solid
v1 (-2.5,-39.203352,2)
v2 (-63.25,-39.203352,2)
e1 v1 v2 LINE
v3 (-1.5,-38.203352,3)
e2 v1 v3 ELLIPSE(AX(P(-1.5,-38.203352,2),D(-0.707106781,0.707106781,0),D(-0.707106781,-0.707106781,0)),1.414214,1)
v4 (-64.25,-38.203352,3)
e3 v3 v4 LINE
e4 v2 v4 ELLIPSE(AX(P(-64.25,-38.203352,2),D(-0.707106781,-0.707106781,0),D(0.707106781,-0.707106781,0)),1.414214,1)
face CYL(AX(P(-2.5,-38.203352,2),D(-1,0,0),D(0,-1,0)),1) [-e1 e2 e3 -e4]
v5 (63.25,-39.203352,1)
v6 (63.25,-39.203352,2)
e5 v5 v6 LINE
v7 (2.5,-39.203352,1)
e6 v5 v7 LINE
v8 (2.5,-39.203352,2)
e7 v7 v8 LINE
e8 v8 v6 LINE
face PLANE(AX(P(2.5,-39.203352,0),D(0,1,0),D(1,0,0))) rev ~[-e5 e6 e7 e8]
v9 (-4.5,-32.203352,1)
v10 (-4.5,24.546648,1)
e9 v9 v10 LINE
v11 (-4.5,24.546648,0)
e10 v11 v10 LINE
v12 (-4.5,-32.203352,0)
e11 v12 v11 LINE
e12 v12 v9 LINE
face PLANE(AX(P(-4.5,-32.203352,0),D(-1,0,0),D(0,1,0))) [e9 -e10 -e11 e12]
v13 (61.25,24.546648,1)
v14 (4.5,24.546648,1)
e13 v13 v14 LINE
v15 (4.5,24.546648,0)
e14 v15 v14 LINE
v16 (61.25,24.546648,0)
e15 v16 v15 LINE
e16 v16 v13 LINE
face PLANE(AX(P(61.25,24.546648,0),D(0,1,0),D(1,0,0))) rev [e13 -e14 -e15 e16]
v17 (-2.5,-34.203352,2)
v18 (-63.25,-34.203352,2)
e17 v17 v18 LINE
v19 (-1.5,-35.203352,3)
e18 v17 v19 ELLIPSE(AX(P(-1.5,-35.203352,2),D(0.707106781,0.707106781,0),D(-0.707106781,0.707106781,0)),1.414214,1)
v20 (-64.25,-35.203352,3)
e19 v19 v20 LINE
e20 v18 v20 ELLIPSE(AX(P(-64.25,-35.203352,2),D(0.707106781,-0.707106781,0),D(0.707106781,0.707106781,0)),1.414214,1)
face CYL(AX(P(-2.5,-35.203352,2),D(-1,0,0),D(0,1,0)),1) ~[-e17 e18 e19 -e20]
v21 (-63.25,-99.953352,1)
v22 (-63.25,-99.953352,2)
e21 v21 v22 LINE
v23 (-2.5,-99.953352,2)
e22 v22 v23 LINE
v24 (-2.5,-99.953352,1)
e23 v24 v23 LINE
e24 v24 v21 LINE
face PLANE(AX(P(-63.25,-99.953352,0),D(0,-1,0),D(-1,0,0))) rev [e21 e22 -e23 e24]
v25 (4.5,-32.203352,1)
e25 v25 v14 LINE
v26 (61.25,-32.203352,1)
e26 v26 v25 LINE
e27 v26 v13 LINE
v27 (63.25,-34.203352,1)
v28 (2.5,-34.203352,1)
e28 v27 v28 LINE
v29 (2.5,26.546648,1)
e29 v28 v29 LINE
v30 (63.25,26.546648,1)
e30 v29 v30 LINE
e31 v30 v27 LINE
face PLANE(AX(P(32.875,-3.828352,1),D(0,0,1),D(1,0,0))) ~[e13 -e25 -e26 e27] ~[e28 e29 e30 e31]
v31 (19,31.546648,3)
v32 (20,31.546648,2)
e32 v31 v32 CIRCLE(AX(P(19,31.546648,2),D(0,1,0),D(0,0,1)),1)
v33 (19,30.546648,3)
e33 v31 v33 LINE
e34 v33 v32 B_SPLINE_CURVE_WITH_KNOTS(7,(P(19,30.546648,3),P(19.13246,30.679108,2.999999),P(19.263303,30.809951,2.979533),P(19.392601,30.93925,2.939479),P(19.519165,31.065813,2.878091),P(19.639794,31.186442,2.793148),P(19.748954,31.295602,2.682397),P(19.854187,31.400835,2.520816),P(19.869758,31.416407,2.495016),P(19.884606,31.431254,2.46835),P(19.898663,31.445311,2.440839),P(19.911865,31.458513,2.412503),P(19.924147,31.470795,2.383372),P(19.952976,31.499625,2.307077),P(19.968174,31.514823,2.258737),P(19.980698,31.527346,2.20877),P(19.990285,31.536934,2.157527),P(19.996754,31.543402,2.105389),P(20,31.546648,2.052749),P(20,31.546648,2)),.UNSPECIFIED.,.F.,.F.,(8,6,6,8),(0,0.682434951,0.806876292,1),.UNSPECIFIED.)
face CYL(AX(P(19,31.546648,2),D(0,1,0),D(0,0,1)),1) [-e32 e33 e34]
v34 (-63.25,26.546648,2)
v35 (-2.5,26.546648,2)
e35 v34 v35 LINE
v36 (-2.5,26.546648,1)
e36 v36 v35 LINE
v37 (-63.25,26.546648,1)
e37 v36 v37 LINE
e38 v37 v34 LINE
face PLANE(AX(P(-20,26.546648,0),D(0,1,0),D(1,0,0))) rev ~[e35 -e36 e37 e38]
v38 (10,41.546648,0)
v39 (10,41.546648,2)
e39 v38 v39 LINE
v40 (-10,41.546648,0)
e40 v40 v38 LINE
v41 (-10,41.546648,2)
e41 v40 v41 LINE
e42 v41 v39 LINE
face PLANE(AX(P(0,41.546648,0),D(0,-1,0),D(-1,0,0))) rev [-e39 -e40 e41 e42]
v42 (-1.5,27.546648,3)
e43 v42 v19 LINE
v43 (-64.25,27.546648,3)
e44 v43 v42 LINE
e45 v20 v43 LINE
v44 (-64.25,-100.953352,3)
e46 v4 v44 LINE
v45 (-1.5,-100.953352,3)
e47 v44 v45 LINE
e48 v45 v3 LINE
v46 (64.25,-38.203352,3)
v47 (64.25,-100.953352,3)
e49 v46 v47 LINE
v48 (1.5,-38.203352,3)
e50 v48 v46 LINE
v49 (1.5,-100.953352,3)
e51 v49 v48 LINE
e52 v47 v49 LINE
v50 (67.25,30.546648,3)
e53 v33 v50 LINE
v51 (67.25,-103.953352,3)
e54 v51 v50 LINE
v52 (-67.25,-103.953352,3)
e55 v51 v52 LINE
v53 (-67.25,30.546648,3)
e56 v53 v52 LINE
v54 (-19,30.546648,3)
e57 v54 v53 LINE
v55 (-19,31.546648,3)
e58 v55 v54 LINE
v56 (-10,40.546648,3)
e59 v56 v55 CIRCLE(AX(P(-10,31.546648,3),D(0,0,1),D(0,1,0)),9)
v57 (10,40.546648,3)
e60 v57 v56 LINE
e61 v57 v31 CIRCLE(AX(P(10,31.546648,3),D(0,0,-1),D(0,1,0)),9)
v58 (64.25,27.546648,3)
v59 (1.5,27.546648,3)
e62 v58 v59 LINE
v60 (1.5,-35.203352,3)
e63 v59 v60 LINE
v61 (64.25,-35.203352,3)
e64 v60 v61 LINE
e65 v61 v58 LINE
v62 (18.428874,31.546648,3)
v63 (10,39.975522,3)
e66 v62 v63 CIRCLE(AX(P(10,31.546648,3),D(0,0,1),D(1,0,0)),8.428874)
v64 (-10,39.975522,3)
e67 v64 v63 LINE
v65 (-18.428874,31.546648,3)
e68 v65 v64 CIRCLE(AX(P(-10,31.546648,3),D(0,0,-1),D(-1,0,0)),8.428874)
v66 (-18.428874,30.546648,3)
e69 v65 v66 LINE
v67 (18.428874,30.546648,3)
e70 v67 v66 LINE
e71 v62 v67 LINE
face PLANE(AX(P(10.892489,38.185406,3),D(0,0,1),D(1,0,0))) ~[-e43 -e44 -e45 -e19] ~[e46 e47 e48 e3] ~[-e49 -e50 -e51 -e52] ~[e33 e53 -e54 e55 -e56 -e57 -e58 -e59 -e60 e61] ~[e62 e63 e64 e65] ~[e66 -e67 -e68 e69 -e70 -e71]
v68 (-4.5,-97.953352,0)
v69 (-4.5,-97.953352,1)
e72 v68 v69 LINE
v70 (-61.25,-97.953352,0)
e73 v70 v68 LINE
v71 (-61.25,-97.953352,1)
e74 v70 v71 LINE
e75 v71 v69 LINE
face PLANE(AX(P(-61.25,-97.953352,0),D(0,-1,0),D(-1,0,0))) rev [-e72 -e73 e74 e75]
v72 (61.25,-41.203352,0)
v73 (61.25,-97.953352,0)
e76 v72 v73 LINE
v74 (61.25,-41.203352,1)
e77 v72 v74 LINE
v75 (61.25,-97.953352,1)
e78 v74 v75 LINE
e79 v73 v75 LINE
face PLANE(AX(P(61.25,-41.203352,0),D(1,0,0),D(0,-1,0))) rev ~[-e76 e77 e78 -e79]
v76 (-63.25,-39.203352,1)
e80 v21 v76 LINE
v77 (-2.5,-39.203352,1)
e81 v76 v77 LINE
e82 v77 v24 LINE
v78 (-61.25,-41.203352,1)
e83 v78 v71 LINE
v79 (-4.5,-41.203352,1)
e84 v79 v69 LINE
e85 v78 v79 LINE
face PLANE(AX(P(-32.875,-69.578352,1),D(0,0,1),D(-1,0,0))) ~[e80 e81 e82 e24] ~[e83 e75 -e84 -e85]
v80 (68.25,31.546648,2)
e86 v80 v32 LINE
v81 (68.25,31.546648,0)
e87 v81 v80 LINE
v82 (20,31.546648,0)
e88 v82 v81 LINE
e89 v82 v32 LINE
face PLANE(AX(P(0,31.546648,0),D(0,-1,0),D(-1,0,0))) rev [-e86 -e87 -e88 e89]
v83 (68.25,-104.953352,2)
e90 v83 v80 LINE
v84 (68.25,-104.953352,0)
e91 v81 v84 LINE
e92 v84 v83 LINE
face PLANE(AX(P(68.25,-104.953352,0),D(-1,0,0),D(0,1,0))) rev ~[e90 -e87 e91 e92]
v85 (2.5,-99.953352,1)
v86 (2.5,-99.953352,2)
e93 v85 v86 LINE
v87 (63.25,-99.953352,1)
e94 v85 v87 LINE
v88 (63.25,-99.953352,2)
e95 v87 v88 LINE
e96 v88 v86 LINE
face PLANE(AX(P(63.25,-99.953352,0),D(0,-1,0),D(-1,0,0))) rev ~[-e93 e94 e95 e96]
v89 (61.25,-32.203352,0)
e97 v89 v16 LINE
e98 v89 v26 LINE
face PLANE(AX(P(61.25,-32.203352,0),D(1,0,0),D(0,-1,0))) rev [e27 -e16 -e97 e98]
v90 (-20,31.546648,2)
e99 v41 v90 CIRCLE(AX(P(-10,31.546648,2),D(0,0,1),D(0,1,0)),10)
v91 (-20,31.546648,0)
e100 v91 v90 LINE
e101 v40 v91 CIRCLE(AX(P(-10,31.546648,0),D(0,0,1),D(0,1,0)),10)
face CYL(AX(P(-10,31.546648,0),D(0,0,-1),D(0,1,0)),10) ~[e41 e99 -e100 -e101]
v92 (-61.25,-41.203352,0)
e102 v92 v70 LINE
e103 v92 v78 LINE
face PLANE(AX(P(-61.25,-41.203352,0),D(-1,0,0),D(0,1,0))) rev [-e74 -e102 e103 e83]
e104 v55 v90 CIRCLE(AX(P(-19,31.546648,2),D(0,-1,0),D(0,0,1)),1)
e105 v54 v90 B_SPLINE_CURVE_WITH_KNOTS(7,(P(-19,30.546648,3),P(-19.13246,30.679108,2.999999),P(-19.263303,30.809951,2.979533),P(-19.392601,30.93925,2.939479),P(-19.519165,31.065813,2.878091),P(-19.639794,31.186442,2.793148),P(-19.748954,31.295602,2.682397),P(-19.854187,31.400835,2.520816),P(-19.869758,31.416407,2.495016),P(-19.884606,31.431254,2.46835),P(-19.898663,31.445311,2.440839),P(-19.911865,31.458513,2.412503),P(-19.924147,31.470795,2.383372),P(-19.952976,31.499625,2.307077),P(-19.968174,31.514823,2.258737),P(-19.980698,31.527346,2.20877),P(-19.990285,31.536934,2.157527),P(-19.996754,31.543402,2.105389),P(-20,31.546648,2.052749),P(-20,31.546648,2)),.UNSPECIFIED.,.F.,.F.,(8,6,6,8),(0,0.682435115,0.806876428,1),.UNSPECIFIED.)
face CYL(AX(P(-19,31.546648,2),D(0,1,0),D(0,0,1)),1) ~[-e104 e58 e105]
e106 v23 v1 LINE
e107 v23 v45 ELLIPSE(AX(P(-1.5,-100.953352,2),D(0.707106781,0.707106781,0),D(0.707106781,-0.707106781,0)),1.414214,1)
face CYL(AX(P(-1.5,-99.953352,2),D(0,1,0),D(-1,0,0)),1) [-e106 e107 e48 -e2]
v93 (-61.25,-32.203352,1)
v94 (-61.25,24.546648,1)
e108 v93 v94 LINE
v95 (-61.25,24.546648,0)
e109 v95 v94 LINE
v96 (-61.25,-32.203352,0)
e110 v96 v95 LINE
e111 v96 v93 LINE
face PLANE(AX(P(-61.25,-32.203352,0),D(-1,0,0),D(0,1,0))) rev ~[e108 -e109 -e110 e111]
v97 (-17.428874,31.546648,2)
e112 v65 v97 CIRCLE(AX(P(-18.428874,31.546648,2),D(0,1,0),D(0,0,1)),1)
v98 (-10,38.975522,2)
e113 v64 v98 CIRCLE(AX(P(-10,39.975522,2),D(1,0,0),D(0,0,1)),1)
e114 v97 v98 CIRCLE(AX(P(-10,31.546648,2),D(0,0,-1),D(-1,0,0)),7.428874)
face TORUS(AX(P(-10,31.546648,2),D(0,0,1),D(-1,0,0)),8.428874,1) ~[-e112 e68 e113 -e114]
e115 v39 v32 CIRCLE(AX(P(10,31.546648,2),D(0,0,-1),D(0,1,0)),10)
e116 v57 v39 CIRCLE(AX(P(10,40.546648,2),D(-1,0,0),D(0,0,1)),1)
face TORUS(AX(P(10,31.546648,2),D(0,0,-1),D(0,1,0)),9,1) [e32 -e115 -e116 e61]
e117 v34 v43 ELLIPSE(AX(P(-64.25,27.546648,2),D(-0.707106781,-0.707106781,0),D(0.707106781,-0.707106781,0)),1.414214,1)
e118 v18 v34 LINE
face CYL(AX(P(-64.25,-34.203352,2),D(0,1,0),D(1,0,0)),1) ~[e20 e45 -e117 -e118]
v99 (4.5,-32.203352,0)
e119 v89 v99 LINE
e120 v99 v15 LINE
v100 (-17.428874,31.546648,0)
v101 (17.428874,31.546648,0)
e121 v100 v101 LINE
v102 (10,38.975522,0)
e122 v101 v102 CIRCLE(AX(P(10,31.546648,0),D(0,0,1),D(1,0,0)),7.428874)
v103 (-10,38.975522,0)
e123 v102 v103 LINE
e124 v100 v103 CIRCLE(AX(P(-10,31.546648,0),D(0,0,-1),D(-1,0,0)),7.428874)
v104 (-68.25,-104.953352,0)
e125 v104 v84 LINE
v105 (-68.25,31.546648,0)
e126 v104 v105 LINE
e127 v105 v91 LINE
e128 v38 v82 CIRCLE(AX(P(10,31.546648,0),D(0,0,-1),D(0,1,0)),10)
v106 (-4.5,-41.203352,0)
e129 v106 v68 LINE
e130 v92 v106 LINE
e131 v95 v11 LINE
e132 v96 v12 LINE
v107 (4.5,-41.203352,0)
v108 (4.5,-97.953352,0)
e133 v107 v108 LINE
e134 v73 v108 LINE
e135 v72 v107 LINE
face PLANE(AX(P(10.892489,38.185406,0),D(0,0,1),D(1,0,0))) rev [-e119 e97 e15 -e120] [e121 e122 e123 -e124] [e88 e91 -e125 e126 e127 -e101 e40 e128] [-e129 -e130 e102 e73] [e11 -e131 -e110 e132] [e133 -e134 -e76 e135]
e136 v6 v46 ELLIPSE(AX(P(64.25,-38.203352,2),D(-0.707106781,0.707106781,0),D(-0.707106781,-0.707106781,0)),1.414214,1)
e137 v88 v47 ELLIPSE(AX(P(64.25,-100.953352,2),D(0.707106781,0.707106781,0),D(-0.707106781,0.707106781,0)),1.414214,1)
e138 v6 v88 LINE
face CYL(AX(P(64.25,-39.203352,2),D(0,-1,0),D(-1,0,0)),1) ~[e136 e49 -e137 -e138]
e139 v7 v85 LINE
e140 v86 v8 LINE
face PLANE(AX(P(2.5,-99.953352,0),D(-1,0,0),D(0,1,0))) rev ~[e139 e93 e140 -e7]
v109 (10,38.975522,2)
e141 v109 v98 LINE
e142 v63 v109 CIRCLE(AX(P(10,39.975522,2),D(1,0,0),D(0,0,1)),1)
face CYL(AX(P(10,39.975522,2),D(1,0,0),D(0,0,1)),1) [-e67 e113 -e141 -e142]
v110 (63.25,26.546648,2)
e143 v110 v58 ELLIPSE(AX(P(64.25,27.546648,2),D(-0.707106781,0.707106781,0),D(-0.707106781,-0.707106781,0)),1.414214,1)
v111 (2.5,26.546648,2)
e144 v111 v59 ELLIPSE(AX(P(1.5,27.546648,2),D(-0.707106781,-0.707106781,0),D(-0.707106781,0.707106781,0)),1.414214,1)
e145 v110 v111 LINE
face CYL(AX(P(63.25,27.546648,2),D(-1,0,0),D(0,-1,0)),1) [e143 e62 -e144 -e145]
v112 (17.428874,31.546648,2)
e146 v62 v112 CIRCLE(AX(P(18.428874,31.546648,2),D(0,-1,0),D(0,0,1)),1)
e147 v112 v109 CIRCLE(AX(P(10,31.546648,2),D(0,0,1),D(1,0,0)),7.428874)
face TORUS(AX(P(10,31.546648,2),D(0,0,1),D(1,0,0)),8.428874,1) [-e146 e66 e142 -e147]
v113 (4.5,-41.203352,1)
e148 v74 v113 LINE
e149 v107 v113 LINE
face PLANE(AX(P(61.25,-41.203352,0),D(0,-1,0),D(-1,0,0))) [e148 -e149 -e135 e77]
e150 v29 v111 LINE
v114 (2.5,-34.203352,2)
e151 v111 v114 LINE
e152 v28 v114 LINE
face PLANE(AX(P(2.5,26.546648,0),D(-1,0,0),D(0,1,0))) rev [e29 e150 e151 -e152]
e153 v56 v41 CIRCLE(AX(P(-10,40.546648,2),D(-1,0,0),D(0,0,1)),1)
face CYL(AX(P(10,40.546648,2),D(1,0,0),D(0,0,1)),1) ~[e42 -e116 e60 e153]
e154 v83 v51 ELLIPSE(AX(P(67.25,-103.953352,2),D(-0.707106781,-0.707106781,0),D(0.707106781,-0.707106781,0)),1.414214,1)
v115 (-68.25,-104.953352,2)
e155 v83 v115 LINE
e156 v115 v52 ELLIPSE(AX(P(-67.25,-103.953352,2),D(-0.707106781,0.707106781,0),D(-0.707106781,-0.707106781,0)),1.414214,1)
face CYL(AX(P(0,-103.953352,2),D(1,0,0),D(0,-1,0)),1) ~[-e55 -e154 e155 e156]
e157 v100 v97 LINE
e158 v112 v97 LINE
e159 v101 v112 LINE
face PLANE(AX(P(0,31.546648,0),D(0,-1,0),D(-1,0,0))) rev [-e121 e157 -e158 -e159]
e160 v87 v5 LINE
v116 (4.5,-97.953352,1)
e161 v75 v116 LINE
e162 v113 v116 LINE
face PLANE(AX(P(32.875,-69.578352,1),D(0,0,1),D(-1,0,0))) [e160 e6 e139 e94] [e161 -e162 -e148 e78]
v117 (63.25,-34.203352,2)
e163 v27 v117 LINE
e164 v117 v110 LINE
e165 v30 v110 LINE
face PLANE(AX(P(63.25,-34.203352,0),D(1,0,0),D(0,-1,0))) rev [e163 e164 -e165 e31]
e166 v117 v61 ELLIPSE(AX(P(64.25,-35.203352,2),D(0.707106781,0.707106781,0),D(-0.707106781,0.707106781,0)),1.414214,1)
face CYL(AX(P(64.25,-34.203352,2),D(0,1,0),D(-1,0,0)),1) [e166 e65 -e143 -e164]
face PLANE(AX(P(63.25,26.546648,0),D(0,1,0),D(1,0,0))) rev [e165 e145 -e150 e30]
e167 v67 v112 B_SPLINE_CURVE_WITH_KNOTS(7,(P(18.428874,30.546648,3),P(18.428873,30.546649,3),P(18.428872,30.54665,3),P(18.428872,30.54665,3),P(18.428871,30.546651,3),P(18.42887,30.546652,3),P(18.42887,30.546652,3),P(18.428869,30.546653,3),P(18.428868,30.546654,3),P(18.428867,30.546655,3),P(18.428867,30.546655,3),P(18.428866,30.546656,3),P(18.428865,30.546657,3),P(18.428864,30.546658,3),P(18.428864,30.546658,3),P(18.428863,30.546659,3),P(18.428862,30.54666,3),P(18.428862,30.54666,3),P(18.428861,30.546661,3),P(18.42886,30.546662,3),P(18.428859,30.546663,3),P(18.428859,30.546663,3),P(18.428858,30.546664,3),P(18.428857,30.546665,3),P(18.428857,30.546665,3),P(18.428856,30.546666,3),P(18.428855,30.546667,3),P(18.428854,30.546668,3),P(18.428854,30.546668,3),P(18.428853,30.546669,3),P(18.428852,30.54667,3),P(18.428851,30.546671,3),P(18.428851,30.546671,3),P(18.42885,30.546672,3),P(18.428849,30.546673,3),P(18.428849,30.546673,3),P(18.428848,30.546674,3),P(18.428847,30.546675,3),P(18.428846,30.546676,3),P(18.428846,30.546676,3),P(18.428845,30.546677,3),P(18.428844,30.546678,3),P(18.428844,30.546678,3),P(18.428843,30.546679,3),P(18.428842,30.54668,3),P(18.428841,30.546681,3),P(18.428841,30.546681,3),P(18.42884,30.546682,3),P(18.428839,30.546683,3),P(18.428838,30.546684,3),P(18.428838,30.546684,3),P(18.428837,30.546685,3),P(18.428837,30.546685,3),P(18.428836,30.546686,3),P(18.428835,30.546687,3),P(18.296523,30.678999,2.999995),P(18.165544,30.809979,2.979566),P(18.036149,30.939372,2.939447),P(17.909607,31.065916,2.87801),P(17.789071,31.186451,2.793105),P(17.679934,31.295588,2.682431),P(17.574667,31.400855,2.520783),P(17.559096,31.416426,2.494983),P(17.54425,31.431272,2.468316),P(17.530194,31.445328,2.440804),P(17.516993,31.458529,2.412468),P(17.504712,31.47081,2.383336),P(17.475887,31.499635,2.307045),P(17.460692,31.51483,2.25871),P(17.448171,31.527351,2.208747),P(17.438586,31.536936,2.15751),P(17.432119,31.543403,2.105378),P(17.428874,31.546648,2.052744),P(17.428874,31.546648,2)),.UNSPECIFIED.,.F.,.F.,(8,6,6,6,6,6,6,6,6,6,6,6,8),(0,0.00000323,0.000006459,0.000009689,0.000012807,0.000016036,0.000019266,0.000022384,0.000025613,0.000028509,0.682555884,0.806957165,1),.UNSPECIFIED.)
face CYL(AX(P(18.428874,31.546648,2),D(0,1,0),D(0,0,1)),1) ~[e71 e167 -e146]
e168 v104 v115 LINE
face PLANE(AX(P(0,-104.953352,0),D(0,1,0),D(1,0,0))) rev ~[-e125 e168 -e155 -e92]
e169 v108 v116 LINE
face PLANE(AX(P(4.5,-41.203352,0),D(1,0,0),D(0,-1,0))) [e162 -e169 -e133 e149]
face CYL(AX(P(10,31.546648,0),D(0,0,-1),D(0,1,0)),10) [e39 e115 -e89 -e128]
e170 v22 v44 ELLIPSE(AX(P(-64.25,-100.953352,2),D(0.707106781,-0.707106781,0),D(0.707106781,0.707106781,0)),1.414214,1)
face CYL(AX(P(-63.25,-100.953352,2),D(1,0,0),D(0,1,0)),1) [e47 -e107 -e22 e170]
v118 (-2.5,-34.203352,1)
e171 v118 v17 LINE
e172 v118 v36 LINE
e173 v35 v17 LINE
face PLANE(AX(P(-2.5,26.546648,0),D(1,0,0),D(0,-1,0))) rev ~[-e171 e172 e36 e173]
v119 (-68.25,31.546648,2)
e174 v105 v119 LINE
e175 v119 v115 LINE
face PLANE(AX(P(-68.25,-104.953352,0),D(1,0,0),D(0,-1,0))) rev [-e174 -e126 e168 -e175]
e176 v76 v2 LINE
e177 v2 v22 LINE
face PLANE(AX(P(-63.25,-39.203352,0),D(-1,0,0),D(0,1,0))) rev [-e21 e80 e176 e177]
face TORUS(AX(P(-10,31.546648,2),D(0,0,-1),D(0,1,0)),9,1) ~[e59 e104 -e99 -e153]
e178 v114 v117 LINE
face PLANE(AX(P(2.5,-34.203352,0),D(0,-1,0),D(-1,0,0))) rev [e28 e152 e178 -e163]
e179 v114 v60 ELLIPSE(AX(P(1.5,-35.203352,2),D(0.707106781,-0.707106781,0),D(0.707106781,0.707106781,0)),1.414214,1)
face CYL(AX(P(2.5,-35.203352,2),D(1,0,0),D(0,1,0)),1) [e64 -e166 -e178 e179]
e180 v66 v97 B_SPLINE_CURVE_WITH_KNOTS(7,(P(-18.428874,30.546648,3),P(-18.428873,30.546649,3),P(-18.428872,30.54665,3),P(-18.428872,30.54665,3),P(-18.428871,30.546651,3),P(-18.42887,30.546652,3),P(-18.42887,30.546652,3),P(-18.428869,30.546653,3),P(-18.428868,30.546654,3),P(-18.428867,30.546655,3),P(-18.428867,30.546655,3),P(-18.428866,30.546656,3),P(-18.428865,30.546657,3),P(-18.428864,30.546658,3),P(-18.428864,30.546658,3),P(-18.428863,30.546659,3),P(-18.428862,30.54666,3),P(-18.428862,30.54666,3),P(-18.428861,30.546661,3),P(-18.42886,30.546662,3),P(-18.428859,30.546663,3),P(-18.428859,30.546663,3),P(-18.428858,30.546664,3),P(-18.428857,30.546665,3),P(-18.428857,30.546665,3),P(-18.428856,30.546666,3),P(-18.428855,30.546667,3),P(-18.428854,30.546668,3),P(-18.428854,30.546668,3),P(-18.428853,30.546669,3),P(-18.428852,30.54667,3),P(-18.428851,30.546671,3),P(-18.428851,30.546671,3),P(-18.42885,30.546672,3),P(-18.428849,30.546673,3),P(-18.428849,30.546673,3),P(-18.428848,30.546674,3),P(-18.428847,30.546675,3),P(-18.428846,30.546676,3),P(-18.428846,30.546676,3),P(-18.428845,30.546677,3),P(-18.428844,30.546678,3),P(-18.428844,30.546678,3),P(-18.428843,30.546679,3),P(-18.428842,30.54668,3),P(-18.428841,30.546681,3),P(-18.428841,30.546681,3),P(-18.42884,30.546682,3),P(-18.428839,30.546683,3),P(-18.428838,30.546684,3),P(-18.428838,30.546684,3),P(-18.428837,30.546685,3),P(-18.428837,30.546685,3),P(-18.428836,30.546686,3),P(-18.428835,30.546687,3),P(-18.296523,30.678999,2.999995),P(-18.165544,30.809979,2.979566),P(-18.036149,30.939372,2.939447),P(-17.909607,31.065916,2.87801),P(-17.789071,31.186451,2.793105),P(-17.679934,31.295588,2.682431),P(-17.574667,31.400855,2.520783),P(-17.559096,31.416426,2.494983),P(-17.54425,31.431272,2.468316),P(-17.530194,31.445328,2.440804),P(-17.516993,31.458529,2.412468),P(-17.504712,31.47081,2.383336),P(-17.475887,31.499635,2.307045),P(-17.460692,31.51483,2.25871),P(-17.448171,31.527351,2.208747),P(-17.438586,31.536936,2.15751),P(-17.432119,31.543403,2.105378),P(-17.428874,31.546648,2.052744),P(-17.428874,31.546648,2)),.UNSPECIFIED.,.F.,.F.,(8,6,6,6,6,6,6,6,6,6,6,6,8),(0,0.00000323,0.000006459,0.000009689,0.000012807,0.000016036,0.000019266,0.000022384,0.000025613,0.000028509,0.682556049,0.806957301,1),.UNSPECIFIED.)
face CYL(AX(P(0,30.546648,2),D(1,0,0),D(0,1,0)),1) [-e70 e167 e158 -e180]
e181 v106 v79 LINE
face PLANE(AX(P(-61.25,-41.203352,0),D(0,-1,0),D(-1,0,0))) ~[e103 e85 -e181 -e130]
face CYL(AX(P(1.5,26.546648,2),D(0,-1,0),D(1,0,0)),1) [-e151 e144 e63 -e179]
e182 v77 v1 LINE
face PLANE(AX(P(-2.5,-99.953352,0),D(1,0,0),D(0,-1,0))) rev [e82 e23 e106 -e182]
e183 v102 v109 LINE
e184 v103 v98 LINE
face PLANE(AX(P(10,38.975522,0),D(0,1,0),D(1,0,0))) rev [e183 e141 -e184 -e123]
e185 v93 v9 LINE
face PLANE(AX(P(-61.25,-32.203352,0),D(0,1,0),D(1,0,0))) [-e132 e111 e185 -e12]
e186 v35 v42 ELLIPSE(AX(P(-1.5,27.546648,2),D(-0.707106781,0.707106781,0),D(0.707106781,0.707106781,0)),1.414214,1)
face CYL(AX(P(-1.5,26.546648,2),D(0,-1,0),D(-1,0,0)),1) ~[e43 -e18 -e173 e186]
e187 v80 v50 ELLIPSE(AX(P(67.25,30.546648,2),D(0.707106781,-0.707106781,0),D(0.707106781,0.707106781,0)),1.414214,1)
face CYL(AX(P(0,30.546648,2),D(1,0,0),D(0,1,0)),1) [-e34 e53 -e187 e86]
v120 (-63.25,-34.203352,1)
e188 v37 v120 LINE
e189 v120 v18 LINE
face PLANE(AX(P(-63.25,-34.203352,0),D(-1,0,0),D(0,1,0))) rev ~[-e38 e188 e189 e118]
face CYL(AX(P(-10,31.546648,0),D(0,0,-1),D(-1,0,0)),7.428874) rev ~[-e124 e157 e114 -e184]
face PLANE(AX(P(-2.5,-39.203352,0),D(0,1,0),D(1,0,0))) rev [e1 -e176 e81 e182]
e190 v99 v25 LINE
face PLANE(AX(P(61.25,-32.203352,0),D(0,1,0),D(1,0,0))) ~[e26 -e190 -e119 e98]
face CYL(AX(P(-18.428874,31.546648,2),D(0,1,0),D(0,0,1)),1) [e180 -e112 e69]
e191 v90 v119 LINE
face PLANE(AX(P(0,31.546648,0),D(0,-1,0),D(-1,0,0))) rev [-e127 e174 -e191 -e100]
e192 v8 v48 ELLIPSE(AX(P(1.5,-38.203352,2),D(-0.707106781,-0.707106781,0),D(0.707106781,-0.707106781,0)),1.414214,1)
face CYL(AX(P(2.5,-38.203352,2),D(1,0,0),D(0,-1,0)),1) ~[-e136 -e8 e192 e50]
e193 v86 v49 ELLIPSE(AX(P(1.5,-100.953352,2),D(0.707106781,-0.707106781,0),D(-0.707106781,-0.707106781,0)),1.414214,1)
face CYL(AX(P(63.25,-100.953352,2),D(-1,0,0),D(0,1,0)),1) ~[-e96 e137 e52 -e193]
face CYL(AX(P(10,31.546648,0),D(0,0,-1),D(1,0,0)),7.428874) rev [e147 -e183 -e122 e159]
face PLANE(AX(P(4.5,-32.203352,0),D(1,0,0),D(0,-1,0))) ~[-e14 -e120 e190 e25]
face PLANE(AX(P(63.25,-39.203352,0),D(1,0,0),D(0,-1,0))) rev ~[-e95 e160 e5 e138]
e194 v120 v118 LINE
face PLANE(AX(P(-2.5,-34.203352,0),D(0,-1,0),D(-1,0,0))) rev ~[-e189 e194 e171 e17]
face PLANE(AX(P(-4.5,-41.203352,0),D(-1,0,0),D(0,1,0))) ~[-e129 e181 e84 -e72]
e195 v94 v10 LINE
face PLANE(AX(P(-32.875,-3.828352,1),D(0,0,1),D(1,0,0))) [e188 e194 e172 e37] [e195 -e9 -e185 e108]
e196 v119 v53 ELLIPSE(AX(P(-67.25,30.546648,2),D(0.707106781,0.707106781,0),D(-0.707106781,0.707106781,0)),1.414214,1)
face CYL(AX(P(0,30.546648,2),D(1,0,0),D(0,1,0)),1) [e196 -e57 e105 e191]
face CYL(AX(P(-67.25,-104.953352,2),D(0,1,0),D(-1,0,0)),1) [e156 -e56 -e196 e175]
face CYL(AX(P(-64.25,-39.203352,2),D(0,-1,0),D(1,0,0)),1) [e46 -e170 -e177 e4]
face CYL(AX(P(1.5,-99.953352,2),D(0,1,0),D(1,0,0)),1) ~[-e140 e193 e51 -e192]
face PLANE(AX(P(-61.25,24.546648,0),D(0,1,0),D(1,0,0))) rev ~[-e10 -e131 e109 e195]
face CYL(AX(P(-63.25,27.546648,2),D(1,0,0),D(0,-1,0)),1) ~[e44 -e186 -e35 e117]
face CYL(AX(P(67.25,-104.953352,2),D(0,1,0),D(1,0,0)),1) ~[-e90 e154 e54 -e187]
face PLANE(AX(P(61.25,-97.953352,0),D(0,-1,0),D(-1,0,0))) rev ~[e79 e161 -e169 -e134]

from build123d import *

# Parameters (mm, degrees)
F0_W         = 2.5711264648
F0_H         = 5
F1_DEPTH     = 3
F0_W_2       = 56.75
F0_H_2       = 56.75
F2_DEPTH     = 1
F3_R         = 1
F6_DEPTH     = 3
F7_T1_DEPTH  = 12.5
F7_T3_DEPTH  = 7.5711264648
F7_T5_DEPTH  = 3.5
F7_T8_ANGLE  = 90
F7_T10_ANGLE = 90


# Not quite as in the source:
# - a fillet or chamfer that OpenCascade refuses, or shapes differently, is made with other operations: its cross-section is extruded or revolved along the edge and cut away or added
# - a feature names something its author has since deleted; it is built from what else it names


with BuildPart() as f1:
    # F0 (on Top) → F1 (new body)
    with BuildSketch(Plane.XY):
        Polygon((-63.25, -34.2033516131), (-63.25, 26.5466483869), (-20, 26.5466483869), (-20, 31.5466483869), (-34.125, 31.5466483869), (-68.25, 31.5466483869), (-68.25, -36.7033516131), (0, -36.7033516131), (0, 31.5466483869), (-17.4288735352, 31.5466483869), (-17.4288735352, 26.5466483869), (-2.5, 26.5466483869), (-2.5, -34.2033516131), align=None)
        with Locations((-18.7144367676, 29.0466483869)):
            Rectangle(F0_W, F0_H)
    extrude(amount=F1_DEPTH)

    # F0 (on Top) → F2 (join)
    with BuildSketch(Plane.XY):
        Polygon((-20, 26.5466483869), (-63.25, 26.5466483869), (-63.25, -34.2033516131), (-2.5, -34.2033516131), (-2.5, 26.5466483869), (-17.4288735352, 26.5466483869), align=None)
        with Locations((-32.875, -3.8283516131)):
            Rectangle(F0_W_2, F0_H_2, mode=Mode.SUBTRACT)
    extrude(amount=F2_DEPTH)

    # F3
    f3_edges = [f1.edges().sort_by_distance(p)[0] for p in [
        (-32.875, 26.546648, 3),
        (-63.25, -3.828352, 3),
        (-32.875, -34.203352, 3),
        (-2.5, -3.828352, 3),
        (-34.125, 31.546648, 3),
        (-68.25, -2.578352, 3),
    ]]
    fillet(f3_edges, radius=F3_R)

    # F4: F1 across plane


with BuildPart() as f1_1:
    add(f1.part)
    add(f1.part.mirror(Plane.YZ))

    # F5: F1 across face


with BuildPart() as f1_2:
    add(f1_1.part)
    add(f1_1.part.mirror(Plane(origin=(0, -36.7033516131, 1.4986605371), x_dir=(1, 0, 0), z_dir=(0, -1, 0))))

    # F0 (on Top) → F6 (join)
    with BuildSketch(Plane.XY):
        with BuildLine():
            ThreePointArc((-10, 41.5466483869), (-17.0710678119, 38.6177161988), (-20, 31.5466483869))
            Line((-20, 31.5466483869), (-17.4288735352, 31.5466483869))
            ThreePointArc((-17.4288735352, 31.5466483869), (-15.2530068533, 36.7996552402), (-10, 38.9755219221))
            Line((-10, 38.9755219221), (0, 38.9755219221))
            Line((0, 38.9755219221), (0, 41.5466483869))
            Line((0, 41.5466483869), (-10, 41.5466483869))
        make_face()
        with Locations((-18.7144367676, 29.0466483869)):
            Rectangle(F0_W, F0_H)
    extrude(amount=F6_DEPTH)

    # F7: fillet of radius 1 on 4 edges, made by hand

    # F7_s2 → F7_t1 (cut)
    with BuildSketch(Plane.YZ.offset(-10)):
        with BuildLine():
            ThreePointArc((39.9755219221, 3), (39.2684151409, 2.7071067812), (38.9755219221, 2))
            Line((38.9755219221, 2), (38.9755219221, 3))
            Line((38.9755219221, 3), (39.9755219221, 3))
        make_face()
        with BuildLine():
            ThreePointArc((40.5466483869, 3), (41.2537551681, 2.7071067812), (41.5466483869, 2))
            Line((41.5466483869, 2), (41.5466483869, 3))
            Line((41.5466483869, 3), (40.5466483869, 3))
        make_face()
    extrude(amount=F7_T1_DEPTH, mode=Mode.SUBTRACT)

    # F7_s4 → F7_t3 (cut)
    with BuildSketch(Plane.YZ.offset(-22.5)):
        with BuildLine():
            ThreePointArc((27.5466483869, 3), (26.8395416057, 2.7071067812), (26.5466483869, 2))
            Line((26.5466483869, 2), (26.5466483869, 3))
            Line((26.5466483869, 3), (27.5466483869, 3))
        make_face()
    extrude(amount=F7_T3_DEPTH, mode=Mode.SUBTRACT)

    # F7_s6 → F7_t5 (cut)
    with BuildSketch(Plane.XZ.offset(-31.5466483869)):
        with BuildLine():
            ThreePointArc((-19, 3), (-19.7071067812, 2.7071067812), (-20, 2))
            Line((-20, 2), (-20, 3))
            Line((-20, 3), (-19, 3))
        make_face()
        with BuildLine():
            ThreePointArc((-18.4288735352, 3), (-17.721766754, 2.7071067812), (-17.4288735352, 2))
            Line((-17.4288735352, 2), (-17.4288735352, 3))
            Line((-17.4288735352, 3), (-18.4288735352, 3))
        make_face()
    extrude(amount=F7_T5_DEPTH, mode=Mode.SUBTRACT)

    # F7_s7 → F7_t8 (revolve, cut)
    with BuildSketch(Plane.XZ.offset(-31.5466483869)):
        with BuildLine():
            ThreePointArc((-18.4288735352, 3), (-17.721766754, 2.7071067812), (-17.4288735352, 2))
            Line((-17.4288735352, 2), (-17.4288735352, 3))
            Line((-17.4288735352, 3), (-18.4288735352, 3))
        make_face()
    revolve(axis=Axis((-10, 31.5466483869, 3), (0, 0, -1)), revolution_arc=F7_T8_ANGLE, mode=Mode.SUBTRACT)

    # F7_s9 → F7_t10 (revolve, cut)
    with BuildSketch(Plane.YZ.offset(-10)):
        with BuildLine():
            ThreePointArc((40.5466483869, 3), (41.2537551681, 2.7071067812), (41.5466483869, 2))
            Line((41.5466483869, 2), (41.5466483869, 3))
            Line((41.5466483869, 3), (40.5466483869, 3))
        make_face()
    revolve(axis=Axis((-10, 31.5466483869, 3), (0, 0, 1)), revolution_arc=F7_T10_ANGLE, mode=Mode.SUBTRACT)

    # F8: F1 across plane


with BuildPart() as f1_3:
    add(f1_2.part)
    add(f1_2.part.mirror(Plane.YZ))


solid = f1_3.part
